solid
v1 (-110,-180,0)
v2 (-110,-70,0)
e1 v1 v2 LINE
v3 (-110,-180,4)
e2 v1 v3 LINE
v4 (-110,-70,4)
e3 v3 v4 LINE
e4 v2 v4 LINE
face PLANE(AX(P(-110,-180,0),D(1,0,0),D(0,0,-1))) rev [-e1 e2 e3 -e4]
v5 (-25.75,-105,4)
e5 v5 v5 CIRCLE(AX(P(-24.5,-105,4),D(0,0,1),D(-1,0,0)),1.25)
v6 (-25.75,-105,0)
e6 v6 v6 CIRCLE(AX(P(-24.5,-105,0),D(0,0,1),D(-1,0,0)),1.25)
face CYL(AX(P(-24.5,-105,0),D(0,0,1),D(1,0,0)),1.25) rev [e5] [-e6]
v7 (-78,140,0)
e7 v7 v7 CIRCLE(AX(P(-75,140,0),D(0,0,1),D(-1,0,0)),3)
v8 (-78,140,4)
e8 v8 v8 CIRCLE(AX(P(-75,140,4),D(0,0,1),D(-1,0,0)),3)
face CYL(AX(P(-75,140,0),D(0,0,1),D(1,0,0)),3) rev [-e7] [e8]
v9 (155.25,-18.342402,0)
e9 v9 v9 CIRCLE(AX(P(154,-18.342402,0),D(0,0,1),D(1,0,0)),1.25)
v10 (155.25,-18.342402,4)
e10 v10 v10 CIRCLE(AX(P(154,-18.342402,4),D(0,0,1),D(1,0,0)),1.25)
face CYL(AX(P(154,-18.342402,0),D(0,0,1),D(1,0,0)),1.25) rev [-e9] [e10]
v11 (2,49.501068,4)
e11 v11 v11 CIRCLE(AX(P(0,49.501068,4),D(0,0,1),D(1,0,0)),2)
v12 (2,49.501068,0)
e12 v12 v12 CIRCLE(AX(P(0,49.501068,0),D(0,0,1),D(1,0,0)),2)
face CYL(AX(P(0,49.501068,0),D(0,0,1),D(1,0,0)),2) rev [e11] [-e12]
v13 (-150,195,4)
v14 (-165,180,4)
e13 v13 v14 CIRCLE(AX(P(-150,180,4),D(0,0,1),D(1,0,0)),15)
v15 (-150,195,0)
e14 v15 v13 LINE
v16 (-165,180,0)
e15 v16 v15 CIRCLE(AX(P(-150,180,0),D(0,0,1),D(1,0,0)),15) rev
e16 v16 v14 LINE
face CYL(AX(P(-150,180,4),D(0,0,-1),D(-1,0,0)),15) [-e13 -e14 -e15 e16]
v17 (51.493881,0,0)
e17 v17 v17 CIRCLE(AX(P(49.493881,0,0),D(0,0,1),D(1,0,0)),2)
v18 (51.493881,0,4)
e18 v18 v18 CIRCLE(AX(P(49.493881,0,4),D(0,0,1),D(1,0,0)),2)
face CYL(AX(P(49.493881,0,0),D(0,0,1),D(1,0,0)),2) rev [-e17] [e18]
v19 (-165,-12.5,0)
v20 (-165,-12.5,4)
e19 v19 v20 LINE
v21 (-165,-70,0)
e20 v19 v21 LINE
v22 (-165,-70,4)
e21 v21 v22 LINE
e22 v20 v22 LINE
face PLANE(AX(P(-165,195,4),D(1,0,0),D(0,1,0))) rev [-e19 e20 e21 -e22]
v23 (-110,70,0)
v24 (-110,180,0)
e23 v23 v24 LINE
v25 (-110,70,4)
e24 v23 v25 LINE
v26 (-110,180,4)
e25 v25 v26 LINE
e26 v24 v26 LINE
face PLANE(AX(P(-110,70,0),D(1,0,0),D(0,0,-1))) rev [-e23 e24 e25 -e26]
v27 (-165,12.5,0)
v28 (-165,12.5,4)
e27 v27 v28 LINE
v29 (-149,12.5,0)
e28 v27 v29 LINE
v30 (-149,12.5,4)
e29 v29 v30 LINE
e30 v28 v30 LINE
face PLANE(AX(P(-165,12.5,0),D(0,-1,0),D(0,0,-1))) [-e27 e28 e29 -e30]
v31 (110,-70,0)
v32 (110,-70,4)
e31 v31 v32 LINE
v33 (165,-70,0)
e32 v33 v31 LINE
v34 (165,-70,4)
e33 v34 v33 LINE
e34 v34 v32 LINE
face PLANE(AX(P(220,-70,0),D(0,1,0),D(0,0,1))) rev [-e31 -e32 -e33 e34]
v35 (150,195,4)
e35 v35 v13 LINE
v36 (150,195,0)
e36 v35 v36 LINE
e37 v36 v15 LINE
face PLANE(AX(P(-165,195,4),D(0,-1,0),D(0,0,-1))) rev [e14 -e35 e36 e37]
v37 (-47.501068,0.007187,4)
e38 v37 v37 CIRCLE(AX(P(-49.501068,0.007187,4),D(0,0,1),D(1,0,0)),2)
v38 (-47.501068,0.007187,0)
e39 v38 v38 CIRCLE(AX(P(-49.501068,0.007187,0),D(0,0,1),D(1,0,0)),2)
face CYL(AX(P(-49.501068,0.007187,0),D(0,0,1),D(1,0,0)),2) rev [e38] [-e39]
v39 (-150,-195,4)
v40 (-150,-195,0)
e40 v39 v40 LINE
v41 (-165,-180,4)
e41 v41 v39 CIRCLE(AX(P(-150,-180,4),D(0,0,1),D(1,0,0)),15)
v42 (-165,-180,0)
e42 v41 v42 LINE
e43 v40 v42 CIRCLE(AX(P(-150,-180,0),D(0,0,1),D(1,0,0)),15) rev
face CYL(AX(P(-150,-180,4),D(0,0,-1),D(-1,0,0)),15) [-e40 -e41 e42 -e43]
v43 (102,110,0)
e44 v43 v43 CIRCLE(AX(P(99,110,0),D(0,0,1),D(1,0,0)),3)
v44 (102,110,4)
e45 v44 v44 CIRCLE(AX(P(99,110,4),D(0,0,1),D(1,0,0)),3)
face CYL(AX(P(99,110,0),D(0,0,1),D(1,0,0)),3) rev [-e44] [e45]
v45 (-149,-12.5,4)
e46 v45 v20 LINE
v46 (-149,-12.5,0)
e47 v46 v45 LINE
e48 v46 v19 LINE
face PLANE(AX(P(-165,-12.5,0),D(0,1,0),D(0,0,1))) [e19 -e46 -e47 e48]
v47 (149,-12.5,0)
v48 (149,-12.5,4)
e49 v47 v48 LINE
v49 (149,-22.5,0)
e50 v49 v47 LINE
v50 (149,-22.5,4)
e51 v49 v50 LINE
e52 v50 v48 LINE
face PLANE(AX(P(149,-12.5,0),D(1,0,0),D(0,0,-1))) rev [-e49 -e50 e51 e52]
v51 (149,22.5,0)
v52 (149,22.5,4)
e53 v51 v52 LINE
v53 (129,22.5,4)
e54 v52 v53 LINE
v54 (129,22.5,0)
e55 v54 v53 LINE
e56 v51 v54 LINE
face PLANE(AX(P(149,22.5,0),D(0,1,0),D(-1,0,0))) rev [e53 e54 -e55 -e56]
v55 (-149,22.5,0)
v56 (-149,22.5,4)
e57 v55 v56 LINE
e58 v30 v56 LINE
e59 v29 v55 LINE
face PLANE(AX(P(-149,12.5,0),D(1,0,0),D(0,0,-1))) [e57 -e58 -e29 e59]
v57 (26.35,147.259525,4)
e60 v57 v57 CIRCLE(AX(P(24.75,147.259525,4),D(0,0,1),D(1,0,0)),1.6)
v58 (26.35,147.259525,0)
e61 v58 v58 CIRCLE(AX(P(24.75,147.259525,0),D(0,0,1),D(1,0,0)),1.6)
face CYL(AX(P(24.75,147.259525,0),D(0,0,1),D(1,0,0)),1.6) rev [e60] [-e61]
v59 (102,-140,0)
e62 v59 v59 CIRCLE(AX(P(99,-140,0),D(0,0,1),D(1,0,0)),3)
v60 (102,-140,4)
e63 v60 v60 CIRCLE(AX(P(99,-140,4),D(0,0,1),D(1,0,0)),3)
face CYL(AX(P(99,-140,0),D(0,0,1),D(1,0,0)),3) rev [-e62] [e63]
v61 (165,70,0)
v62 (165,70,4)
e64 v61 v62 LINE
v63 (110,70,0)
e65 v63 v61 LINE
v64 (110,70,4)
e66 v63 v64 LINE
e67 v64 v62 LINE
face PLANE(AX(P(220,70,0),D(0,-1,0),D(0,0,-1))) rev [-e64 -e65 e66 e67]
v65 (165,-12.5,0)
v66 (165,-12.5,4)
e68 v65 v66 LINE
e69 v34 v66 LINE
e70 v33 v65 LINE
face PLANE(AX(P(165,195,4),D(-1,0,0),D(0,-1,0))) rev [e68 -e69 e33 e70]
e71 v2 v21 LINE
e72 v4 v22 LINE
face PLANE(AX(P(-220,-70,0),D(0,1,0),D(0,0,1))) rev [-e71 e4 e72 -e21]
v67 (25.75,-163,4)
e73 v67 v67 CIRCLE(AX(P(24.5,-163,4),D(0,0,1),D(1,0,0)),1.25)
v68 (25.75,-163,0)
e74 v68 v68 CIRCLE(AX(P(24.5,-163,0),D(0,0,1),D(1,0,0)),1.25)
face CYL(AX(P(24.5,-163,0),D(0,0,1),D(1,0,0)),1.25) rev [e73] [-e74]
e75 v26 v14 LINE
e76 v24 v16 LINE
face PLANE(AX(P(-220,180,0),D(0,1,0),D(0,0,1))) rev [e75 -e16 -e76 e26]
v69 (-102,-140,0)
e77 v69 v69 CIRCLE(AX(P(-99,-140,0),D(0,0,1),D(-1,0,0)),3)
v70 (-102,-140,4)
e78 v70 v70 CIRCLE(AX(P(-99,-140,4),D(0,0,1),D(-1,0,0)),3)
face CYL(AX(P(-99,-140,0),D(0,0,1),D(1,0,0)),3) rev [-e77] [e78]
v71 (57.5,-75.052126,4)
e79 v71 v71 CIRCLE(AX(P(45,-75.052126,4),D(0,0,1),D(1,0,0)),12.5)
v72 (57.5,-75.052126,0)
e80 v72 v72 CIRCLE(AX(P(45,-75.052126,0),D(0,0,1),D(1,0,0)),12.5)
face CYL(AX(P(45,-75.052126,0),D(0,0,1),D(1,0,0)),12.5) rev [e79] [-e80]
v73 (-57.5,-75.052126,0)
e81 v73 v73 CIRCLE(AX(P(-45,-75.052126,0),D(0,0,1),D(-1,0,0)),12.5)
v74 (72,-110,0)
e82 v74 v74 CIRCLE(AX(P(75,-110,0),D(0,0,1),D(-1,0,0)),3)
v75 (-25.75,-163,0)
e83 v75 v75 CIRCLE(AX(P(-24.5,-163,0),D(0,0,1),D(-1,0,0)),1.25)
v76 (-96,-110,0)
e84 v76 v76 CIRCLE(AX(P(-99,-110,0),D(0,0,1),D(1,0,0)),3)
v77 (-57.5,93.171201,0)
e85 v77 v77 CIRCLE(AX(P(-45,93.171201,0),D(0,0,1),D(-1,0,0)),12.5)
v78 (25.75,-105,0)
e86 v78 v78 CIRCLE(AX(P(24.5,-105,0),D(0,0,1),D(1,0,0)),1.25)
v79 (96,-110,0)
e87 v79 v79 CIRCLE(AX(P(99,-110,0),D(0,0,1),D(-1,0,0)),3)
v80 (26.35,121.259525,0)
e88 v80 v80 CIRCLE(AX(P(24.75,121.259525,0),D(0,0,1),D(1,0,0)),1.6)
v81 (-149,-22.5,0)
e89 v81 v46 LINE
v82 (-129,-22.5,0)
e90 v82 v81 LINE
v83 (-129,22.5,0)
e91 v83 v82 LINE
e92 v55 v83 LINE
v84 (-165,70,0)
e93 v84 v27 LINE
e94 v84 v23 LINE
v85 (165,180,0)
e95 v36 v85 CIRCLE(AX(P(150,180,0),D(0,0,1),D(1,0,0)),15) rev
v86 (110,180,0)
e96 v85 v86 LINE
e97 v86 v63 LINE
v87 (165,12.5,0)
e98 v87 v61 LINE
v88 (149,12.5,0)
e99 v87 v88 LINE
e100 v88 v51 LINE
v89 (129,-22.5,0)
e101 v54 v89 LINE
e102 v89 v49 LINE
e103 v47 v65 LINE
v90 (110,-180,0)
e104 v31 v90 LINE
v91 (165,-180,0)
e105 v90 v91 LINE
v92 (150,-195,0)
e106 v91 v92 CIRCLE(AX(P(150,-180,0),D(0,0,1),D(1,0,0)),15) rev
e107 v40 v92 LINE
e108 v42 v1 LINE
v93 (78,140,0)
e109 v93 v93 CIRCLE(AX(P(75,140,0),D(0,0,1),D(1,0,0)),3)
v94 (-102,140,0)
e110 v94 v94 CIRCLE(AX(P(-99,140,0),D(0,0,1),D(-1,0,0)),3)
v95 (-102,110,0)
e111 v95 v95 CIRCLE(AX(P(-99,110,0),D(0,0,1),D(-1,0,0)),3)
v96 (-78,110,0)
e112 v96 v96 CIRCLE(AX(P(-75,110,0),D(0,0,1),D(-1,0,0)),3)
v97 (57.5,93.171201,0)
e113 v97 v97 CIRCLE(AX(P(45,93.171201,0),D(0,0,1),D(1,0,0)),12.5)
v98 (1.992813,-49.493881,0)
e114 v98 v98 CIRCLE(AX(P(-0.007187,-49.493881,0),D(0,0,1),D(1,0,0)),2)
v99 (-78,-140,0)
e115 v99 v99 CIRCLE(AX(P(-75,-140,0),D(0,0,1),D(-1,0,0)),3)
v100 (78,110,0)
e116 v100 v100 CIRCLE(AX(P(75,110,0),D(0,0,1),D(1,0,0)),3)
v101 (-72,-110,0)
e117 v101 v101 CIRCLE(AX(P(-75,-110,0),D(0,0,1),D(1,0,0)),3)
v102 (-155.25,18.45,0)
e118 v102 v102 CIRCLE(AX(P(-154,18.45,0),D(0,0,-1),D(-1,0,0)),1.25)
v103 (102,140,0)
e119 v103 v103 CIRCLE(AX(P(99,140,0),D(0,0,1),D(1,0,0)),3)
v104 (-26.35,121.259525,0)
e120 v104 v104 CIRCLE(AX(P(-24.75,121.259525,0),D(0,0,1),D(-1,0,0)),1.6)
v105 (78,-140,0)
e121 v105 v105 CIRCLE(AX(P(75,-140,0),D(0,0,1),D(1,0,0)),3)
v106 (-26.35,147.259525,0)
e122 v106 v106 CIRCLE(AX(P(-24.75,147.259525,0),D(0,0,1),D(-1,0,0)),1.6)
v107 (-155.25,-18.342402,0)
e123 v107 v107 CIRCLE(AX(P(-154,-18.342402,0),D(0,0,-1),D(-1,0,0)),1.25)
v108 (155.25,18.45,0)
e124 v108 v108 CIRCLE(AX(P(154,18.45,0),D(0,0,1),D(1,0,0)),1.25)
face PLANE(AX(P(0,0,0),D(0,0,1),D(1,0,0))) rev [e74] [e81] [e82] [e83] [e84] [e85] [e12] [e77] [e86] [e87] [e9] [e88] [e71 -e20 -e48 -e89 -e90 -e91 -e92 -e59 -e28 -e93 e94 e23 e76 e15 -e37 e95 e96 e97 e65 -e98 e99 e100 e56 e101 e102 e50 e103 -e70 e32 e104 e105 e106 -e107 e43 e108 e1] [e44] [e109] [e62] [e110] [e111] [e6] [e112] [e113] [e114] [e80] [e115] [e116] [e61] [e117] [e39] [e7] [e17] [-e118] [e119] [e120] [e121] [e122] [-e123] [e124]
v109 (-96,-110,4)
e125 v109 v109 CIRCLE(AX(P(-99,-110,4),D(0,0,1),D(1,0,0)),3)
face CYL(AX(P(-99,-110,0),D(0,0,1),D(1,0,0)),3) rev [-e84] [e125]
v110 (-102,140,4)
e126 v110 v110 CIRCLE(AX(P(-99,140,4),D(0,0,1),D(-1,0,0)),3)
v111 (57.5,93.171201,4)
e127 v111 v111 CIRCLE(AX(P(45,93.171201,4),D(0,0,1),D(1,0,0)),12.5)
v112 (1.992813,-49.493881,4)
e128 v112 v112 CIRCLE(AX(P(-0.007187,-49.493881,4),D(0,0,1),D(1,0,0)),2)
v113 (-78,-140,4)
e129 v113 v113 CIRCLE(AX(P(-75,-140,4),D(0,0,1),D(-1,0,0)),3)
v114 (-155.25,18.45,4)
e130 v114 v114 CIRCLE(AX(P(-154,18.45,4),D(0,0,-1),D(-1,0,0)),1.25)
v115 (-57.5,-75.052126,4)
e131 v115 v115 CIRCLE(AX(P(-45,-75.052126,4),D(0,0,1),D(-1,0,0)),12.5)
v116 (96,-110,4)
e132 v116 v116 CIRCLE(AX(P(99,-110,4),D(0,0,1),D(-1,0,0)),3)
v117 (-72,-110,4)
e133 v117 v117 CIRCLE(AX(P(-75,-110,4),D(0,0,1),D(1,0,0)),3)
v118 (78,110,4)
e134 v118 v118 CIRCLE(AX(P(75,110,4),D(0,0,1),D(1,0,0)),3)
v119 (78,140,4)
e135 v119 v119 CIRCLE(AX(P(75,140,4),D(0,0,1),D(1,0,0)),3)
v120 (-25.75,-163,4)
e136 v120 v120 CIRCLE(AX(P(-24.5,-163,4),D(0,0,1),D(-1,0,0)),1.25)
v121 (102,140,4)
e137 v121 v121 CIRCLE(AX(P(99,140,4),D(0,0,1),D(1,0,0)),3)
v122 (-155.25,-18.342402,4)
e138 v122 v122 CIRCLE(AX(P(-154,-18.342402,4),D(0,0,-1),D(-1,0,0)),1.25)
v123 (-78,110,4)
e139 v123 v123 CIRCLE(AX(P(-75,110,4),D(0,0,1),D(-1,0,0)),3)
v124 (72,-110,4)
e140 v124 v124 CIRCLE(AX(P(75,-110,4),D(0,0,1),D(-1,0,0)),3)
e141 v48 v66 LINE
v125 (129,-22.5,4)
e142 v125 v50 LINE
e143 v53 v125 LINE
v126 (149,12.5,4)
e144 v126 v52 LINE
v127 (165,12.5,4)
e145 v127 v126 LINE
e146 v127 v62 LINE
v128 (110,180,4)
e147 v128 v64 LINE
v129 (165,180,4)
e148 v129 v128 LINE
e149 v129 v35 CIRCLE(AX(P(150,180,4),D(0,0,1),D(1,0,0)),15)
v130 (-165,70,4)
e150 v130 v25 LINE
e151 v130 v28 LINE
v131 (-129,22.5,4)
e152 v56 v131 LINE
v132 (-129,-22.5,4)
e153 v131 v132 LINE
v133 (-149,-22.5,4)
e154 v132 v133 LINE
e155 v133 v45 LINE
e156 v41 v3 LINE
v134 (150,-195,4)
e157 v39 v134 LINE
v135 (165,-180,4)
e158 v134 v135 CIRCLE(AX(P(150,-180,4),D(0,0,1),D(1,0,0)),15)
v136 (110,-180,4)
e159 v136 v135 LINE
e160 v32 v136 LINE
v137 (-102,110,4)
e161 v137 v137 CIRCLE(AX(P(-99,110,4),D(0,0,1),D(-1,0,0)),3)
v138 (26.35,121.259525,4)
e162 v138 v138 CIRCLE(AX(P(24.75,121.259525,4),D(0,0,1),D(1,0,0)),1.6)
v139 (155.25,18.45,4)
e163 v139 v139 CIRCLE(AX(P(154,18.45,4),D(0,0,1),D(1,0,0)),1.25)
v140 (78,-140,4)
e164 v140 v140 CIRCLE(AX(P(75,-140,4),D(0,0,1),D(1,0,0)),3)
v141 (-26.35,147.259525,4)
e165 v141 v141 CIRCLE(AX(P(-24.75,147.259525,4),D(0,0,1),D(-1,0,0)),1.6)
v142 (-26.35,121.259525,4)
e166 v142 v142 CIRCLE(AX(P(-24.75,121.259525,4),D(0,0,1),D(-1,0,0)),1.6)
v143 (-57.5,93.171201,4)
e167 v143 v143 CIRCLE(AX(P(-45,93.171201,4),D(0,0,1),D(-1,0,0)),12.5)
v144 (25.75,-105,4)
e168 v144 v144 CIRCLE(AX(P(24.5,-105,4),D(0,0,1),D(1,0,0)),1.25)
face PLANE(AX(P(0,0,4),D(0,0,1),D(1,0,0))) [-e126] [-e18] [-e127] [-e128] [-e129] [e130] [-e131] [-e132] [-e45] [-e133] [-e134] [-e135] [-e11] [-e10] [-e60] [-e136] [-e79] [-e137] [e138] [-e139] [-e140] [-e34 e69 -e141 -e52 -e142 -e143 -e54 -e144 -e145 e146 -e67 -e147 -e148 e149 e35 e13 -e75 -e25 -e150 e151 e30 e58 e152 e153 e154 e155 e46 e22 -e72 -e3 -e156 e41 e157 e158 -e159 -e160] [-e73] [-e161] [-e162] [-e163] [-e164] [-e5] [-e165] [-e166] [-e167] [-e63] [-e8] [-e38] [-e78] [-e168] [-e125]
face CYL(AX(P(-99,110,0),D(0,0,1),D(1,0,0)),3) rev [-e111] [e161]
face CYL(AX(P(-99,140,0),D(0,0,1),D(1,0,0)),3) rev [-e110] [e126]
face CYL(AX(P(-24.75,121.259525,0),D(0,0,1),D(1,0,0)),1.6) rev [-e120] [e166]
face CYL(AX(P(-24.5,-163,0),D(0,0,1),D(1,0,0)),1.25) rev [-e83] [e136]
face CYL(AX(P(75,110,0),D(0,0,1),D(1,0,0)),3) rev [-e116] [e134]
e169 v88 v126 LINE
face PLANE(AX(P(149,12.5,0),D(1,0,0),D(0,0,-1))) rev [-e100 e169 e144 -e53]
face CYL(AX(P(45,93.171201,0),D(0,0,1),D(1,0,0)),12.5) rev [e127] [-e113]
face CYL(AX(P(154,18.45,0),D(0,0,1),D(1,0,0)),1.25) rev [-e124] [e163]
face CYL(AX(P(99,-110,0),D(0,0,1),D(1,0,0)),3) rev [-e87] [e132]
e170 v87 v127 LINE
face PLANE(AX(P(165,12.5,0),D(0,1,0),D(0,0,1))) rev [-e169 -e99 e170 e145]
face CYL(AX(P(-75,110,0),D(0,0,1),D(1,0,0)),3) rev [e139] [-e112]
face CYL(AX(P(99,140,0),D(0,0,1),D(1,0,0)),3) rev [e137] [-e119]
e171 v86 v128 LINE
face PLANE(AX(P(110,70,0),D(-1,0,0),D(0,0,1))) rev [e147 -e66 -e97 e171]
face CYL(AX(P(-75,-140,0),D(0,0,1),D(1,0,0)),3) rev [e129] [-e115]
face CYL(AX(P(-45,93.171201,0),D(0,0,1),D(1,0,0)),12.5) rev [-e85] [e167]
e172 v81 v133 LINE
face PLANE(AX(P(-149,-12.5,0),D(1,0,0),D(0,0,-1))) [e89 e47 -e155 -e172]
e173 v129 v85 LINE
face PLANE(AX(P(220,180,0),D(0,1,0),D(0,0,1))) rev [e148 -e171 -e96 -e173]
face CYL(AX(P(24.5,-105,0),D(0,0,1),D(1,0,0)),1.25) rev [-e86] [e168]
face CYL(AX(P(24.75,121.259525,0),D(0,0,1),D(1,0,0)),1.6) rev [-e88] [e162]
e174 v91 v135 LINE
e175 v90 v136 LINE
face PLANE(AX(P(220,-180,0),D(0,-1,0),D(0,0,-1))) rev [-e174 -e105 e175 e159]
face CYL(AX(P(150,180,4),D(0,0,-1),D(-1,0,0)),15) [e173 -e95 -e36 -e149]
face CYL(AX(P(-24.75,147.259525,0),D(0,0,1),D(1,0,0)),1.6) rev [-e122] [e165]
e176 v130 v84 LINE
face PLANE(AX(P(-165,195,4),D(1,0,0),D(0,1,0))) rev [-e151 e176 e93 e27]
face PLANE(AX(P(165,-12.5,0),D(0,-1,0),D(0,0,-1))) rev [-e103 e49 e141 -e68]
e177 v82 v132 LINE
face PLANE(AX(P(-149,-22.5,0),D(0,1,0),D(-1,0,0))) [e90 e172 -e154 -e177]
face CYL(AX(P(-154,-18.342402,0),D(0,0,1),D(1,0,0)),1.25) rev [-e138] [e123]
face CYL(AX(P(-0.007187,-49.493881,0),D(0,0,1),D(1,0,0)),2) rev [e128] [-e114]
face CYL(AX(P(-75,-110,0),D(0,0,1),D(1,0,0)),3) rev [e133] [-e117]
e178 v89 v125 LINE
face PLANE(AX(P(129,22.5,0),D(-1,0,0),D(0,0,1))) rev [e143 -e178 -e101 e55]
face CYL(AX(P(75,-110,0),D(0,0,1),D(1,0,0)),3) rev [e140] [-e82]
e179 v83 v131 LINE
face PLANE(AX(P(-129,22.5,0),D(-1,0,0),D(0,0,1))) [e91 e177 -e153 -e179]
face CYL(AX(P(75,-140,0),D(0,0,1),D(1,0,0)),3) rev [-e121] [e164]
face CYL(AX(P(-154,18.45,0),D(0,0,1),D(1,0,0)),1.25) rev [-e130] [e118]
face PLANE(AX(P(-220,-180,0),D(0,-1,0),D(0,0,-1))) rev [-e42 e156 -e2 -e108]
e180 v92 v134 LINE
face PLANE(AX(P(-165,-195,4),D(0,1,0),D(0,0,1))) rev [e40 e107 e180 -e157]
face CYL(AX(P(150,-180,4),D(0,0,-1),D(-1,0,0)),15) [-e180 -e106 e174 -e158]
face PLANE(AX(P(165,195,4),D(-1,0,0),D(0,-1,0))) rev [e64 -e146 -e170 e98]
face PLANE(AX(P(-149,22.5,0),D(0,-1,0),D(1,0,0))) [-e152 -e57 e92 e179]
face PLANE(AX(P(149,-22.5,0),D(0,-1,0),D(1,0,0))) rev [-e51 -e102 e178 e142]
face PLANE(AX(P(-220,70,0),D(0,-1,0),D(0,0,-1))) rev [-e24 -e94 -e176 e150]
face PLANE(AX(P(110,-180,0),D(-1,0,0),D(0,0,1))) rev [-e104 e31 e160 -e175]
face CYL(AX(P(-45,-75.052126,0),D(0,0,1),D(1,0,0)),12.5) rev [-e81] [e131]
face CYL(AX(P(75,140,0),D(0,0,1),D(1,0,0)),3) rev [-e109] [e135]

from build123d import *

# Parameters (mm, degrees)
SKETCH_1_W          = 330
SKETCH_1_H          = 390
EXTRUDE_1_DEPTH     = 4
SKETCH_3_W          = 110
SKETCH_3_H          = 110
CUT_EXTRUDE_1_DEPTH = 4
SKETCH_5_R          = 1.25
CUT_EXTRUDE_2_DEPTH = 4
SKETCH_7_R          = 2
CUT_EXTRUDE_3_DEPTH = 4
SKETCH_8_R          = 1.6
CUT_EXTRUDE_4_DEPTH = 4
SKETCH_9_R          = 3
CUT_EXTRUDE_5_DEPTH = 4
SKETCH_11_R         = 3
CUT_EXTRUDE_6_DEPTH = 4
SKETCH_14_R         = 12.5
CUT_EXTRUDE_7_DEPTH = 4
FILLET_1_R          = 15
SKETCH_15_R         = 1.25
CUT_EXTRUDE_8_DEPTH = 4
CUT_EXTRUDE_9_DEPTH = 4


with BuildPart() as part:
    # 草图1 → 凸台-拉伸1 (new body)
    with BuildSketch(Plane.XY):
        Rectangle(SKETCH_1_W, SKETCH_1_H)
    extrude(amount=EXTRUDE_1_DEPTH)

    # 草图3 → 切除-拉伸1 (cut)
    with BuildSketch(Plane.XY.offset(4)):
        with Locations((165, 125)):
            Rectangle(SKETCH_3_W, SKETCH_3_H)
        with Locations((165, -125)):
            Rectangle(SKETCH_3_W, SKETCH_3_H)
        with Locations((-165, -125)):
            Rectangle(SKETCH_3_W, SKETCH_3_H)
        with Locations((-165, 125)):
            Rectangle(SKETCH_3_W, SKETCH_3_H)
    extrude(amount=-CUT_EXTRUDE_1_DEPTH, mode=Mode.SUBTRACT)

    # 草图5 → 切除-拉伸2 (cut)
    with BuildSketch(Plane.XY.offset(4)):
        with Locations((24.5, -163)):
            Circle(SKETCH_5_R)
        with Locations((24.5, -105)):
            Circle(SKETCH_5_R)
        with Locations(Location((-24.5, -105, 0), (0, 0, 180))):
            Circle(SKETCH_5_R)
        with Locations(Location((-24.5, -163, 0), (0, 0, 180))):
            Circle(SKETCH_5_R)
    extrude(amount=-CUT_EXTRUDE_2_DEPTH, mode=Mode.SUBTRACT)

    # 草图7 → 切除-拉伸3 (cut)
    with BuildSketch(Plane.XY.offset(4)):
        with Locations((49.493881146, 0)):
            Circle(SKETCH_7_R)
        with Locations((-49.501067959, 0.007186813)):
            Circle(SKETCH_7_R)
        with Locations((0, 49.501067959)):
            Circle(SKETCH_7_R)
        with Locations((-0.007186813, -49.493881146)):
            Circle(SKETCH_7_R)
    extrude(amount=-CUT_EXTRUDE_3_DEPTH, mode=Mode.SUBTRACT)

    # 草图8 → 切除-拉伸4 (cut)
    with BuildSketch(Plane.XY.offset(4)):
        with Locations((24.75, 121.25952533)):
            Circle(SKETCH_8_R)
        with Locations((24.75, 147.25952533)):
            Circle(SKETCH_8_R)
        with Locations(Location((-24.75, 147.25952533, 0), (0, 0, 180))):
            Circle(SKETCH_8_R)
        with Locations(Location((-24.75, 121.25952533, 0), (0, 0, 180))):
            Circle(SKETCH_8_R)
    extrude(amount=-CUT_EXTRUDE_4_DEPTH, mode=Mode.SUBTRACT)

    # 草图9 → 切除-拉伸5 (cut)
    with BuildSketch(Plane.XY.offset(4)):
        with Locations((99, -140)):
            Circle(SKETCH_9_R)
        with Locations((75, -140)):
            Circle(SKETCH_9_R)
        with Locations(Location((99, -110, 0), (0, 0, 180))):
            Circle(SKETCH_9_R)
        with Locations(Location((75, -110, 0), (0, 0, 180))):
            Circle(SKETCH_9_R)
        with Locations((-99, -110)):
            Circle(SKETCH_9_R)
        with Locations((-75, -110)):
            Circle(SKETCH_9_R)
        with Locations(Location((-99, -140, 0), (0, 0, 180))):
            Circle(SKETCH_9_R)
        with Locations(Location((-75, -140, 0), (0, 0, 180))):
            Circle(SKETCH_9_R)
    extrude(amount=-CUT_EXTRUDE_5_DEPTH, mode=Mode.SUBTRACT)

    # 草图11 → 切除-拉伸6 (cut)
    with BuildSketch(Plane.XY.offset(4)):
        with Locations((99, 140)):
            Circle(SKETCH_11_R)
        with Locations((99, 110)):
            Circle(SKETCH_11_R)
        with Locations((75, 110)):
            Circle(SKETCH_11_R)
        with Locations((75, 140)):
            Circle(SKETCH_11_R)
        with Locations(Location((-75, 110, 0), (0, 0, 180))):
            Circle(SKETCH_11_R)
        with Locations(Location((-99, 110, 0), (0, 0, 180))):
            Circle(SKETCH_11_R)
        with Locations(Location((-99, 140, 0), (0, 0, 180))):
            Circle(SKETCH_11_R)
        with Locations(Location((-75, 140, 0), (0, 0, 180))):
            Circle(SKETCH_11_R)
    extrude(amount=-CUT_EXTRUDE_6_DEPTH, mode=Mode.SUBTRACT)

    # 草图14 → 切除-拉伸7 (cut)
    with BuildSketch(Plane.XY.offset(4)):
        with Locations((45, 93.171201499)):
            Circle(SKETCH_14_R)
        with Locations((45, -75.052125949)):
            Circle(SKETCH_14_R)
        with Locations(Location((-45, -75.052125949, 0), (0, 0, 180))):
            Circle(SKETCH_14_R)
        with Locations(Location((-45, 93.171201499, 0), (0, 0, 180))):
            Circle(SKETCH_14_R)
    extrude(amount=-CUT_EXTRUDE_7_DEPTH, mode=Mode.SUBTRACT)

    # 圆角1
    fillet_1_edges = [part.edges().sort_by_distance(p)[0] for p in [
        (165, -195, 2),
        (-165, -195, 2),
        (165, 195, 2),
        (-165, 195, 2),
    ]]
    fillet(fillet_1_edges, radius=FILLET_1_R - 0.0001)  # a hair under: the kernel refuses the full size

    # 草图15 → 切除-拉伸8 (cut)
    with BuildSketch(Plane.XY.offset(4)):
        with Locations((154, 18.45)):
            Circle(SKETCH_15_R)
        with Locations((154, -18.342402047)):
            Circle(SKETCH_15_R)
    cut_extrude_8 = extrude(amount=-CUT_EXTRUDE_8_DEPTH, mode=Mode.SUBTRACT)

    # 草图16 → 切除-拉伸9 (cut)
    with BuildSketch(Plane.XY.offset(4)):
        Polygon((165, -12.5), (165, 12.5), (149, 12.5), (149, 22.5), (129, 22.5), (129, -22.5), (149, -22.5), (149, -12.5), align=None)
    cut_extrude_9 = extrude(amount=-CUT_EXTRUDE_9_DEPTH, mode=Mode.SUBTRACT)

    # 镜向1: 切除-拉伸8, 切除-拉伸9 across plane
    add(cut_extrude_8.mirror(Plane(origin=(0, 0, 0), x_dir=(0, 0, 1), z_dir=(1, 0, 0))), mode=Mode.SUBTRACT)
    add(cut_extrude_9.mirror(Plane(origin=(0, 0, 0), x_dir=(0, 0, 1), z_dir=(1, 0, 0))), mode=Mode.SUBTRACT)


solid = part.part
